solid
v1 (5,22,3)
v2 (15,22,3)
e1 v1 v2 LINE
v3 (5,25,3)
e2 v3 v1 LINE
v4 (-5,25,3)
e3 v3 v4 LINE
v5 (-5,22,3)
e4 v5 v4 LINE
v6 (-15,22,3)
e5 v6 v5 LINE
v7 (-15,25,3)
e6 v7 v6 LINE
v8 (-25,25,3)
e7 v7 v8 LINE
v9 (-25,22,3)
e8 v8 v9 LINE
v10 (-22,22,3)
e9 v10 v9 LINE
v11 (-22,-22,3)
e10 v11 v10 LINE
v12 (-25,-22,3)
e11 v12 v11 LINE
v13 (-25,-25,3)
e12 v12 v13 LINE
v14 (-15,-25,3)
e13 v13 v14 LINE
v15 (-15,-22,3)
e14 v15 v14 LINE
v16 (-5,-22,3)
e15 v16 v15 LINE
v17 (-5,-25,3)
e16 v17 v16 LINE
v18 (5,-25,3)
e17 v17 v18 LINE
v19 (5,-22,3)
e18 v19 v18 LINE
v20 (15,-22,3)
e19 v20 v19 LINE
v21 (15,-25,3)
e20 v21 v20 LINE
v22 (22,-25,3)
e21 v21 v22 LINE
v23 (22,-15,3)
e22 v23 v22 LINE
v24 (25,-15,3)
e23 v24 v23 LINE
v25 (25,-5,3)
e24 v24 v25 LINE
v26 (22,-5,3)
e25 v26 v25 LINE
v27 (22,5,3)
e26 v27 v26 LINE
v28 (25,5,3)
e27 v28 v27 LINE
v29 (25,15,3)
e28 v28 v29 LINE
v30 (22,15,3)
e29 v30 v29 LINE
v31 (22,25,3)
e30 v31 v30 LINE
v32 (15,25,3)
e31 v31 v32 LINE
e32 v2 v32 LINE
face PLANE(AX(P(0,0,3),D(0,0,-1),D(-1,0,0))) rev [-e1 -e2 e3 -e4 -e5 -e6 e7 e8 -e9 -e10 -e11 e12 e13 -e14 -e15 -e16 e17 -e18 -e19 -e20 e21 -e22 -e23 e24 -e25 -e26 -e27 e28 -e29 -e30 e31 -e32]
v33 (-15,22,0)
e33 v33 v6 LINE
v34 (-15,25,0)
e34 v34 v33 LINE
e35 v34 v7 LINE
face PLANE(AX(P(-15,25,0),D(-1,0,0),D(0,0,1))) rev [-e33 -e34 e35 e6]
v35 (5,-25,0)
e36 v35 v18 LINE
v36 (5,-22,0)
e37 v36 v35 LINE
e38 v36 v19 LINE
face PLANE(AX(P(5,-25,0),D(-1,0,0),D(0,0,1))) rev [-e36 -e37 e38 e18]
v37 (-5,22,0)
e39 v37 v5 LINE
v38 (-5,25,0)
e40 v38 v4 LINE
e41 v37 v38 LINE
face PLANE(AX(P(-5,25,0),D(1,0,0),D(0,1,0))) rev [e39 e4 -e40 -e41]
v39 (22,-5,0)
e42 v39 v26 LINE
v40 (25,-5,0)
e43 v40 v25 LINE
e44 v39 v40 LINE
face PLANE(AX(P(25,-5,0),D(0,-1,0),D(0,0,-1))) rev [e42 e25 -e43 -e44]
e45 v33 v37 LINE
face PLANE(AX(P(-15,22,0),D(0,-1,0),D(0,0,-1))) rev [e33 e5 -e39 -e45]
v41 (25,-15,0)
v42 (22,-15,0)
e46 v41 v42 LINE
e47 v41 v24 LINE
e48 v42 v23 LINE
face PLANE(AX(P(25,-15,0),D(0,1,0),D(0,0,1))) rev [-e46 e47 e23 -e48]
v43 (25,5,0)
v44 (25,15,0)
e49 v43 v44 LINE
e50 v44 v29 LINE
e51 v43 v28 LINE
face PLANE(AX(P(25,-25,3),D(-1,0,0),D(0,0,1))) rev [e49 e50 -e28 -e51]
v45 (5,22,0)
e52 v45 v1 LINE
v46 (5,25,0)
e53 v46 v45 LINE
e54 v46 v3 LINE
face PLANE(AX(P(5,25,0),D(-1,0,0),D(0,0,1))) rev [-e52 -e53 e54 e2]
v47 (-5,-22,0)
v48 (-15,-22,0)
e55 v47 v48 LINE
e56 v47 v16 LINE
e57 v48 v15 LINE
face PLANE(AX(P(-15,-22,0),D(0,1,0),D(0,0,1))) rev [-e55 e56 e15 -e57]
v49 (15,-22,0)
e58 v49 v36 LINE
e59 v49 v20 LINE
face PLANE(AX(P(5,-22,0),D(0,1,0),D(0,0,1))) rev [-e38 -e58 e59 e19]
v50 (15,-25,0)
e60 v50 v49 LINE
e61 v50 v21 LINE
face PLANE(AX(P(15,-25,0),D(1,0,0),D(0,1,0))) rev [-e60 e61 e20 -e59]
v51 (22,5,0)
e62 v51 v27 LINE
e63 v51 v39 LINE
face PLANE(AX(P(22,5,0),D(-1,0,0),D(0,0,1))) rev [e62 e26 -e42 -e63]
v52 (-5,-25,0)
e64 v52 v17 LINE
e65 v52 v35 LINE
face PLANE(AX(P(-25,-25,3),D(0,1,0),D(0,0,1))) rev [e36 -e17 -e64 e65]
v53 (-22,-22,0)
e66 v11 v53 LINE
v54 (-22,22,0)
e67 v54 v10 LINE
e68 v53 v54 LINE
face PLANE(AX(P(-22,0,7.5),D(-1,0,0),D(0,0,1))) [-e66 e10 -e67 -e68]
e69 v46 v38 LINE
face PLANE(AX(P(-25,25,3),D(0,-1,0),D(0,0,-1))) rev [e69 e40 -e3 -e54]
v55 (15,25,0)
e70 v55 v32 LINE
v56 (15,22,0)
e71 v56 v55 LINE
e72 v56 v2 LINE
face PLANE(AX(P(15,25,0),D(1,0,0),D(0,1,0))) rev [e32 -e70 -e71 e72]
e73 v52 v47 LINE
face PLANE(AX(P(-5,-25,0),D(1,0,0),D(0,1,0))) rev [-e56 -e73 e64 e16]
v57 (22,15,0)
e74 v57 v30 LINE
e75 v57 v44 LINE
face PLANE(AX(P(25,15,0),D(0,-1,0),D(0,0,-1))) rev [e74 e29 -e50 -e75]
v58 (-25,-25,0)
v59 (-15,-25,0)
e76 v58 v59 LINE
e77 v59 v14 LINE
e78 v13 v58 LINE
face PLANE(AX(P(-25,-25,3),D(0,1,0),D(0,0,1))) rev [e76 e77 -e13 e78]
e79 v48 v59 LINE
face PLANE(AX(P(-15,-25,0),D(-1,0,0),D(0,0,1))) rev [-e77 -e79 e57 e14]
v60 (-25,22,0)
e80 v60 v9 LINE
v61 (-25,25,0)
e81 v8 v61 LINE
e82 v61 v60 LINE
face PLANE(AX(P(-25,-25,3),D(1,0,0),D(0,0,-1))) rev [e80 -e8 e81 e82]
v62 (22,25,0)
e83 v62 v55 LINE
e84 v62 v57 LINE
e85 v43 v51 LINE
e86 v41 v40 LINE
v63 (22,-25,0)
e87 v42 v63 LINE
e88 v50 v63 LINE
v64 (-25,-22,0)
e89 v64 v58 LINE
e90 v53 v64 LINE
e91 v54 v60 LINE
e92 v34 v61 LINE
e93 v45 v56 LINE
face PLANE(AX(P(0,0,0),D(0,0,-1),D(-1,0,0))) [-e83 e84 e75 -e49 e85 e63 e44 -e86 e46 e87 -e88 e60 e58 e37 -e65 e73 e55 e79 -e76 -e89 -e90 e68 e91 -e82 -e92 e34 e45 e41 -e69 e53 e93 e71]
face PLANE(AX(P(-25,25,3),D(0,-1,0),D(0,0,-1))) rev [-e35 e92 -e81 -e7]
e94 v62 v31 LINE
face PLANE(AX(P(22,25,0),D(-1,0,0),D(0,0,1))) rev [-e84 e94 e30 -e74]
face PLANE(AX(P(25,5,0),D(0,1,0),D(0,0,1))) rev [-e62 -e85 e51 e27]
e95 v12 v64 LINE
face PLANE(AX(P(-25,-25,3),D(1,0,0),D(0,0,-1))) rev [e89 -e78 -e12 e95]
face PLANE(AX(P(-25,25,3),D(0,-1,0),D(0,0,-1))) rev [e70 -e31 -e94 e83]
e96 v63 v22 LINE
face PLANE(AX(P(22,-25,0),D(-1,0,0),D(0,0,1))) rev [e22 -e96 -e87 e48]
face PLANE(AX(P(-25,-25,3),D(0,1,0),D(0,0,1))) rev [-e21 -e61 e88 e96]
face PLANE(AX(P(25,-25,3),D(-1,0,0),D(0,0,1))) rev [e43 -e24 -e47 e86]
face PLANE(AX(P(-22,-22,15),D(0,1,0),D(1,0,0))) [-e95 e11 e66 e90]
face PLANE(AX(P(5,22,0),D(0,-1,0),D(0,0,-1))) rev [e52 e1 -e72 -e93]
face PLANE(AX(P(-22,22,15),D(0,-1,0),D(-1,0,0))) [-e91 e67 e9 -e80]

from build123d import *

# Parameters (mm, degrees)
SKETCH1_W           = 50
SKETCH1_H           = 50
BOSS_EXTRUDE1_DEPTH = 3
SKETCH2_W           = 10
SKETCH2_H           = 3
SKETCH2_W_2         = 3
SKETCH2_H_2         = 10
CUT_EXTRUDE1_DEPTH  = 3
CAVITY1_START       = -22
CAVITY1_OUTLINE_W   = 3
CAVITY1_OUTLINE_H   = 3
CAVITY1_DEPTH       = 44


# Read off the part's stored shape, not the designer's step: Cavity1
with BuildPart() as part:
    # Sketch1 → Boss-Extrude1 (new body)
    with BuildSketch(Plane.XY):
        Rectangle(SKETCH1_W, SKETCH1_H)
    extrude(amount=BOSS_EXTRUDE1_DEPTH)

    # Sketch2 → Cut-Extrude1 (cut)
    with BuildSketch(Plane.XY.offset(3)):
        with Locations((-10, 23.5)):
            Rectangle(SKETCH2_W, SKETCH2_H)
        with Locations((10, 23.5)):
            Rectangle(SKETCH2_W, SKETCH2_H)
        with Locations((10, -23.5)):
            Rectangle(SKETCH2_W, SKETCH2_H)
        with Locations((-10, -23.5)):
            Rectangle(SKETCH2_W, SKETCH2_H)
        with Locations((23.5, 20)):
            Rectangle(SKETCH2_W_2, SKETCH2_H_2)
        with Locations((23.5, -20)):
            Rectangle(SKETCH2_W_2, SKETCH2_H_2)
        with Locations((23.5, 0)):
            Rectangle(SKETCH2_W_2, SKETCH2_H_2)
    extrude(amount=-CUT_EXTRUDE1_DEPTH, mode=Mode.SUBTRACT)

    # Cavity1 outline → Cavity1 (cut)
    with BuildSketch(Plane(origin=(0, 0, 0), x_dir=(1, 0, 0), z_dir=(0, 1, 0)).offset(CAVITY1_START)):
        with Locations((-23.5, -1.5)):
            Rectangle(CAVITY1_OUTLINE_W, CAVITY1_OUTLINE_H)
    extrude(amount=CAVITY1_DEPTH, mode=Mode.SUBTRACT)


solid = part.part
